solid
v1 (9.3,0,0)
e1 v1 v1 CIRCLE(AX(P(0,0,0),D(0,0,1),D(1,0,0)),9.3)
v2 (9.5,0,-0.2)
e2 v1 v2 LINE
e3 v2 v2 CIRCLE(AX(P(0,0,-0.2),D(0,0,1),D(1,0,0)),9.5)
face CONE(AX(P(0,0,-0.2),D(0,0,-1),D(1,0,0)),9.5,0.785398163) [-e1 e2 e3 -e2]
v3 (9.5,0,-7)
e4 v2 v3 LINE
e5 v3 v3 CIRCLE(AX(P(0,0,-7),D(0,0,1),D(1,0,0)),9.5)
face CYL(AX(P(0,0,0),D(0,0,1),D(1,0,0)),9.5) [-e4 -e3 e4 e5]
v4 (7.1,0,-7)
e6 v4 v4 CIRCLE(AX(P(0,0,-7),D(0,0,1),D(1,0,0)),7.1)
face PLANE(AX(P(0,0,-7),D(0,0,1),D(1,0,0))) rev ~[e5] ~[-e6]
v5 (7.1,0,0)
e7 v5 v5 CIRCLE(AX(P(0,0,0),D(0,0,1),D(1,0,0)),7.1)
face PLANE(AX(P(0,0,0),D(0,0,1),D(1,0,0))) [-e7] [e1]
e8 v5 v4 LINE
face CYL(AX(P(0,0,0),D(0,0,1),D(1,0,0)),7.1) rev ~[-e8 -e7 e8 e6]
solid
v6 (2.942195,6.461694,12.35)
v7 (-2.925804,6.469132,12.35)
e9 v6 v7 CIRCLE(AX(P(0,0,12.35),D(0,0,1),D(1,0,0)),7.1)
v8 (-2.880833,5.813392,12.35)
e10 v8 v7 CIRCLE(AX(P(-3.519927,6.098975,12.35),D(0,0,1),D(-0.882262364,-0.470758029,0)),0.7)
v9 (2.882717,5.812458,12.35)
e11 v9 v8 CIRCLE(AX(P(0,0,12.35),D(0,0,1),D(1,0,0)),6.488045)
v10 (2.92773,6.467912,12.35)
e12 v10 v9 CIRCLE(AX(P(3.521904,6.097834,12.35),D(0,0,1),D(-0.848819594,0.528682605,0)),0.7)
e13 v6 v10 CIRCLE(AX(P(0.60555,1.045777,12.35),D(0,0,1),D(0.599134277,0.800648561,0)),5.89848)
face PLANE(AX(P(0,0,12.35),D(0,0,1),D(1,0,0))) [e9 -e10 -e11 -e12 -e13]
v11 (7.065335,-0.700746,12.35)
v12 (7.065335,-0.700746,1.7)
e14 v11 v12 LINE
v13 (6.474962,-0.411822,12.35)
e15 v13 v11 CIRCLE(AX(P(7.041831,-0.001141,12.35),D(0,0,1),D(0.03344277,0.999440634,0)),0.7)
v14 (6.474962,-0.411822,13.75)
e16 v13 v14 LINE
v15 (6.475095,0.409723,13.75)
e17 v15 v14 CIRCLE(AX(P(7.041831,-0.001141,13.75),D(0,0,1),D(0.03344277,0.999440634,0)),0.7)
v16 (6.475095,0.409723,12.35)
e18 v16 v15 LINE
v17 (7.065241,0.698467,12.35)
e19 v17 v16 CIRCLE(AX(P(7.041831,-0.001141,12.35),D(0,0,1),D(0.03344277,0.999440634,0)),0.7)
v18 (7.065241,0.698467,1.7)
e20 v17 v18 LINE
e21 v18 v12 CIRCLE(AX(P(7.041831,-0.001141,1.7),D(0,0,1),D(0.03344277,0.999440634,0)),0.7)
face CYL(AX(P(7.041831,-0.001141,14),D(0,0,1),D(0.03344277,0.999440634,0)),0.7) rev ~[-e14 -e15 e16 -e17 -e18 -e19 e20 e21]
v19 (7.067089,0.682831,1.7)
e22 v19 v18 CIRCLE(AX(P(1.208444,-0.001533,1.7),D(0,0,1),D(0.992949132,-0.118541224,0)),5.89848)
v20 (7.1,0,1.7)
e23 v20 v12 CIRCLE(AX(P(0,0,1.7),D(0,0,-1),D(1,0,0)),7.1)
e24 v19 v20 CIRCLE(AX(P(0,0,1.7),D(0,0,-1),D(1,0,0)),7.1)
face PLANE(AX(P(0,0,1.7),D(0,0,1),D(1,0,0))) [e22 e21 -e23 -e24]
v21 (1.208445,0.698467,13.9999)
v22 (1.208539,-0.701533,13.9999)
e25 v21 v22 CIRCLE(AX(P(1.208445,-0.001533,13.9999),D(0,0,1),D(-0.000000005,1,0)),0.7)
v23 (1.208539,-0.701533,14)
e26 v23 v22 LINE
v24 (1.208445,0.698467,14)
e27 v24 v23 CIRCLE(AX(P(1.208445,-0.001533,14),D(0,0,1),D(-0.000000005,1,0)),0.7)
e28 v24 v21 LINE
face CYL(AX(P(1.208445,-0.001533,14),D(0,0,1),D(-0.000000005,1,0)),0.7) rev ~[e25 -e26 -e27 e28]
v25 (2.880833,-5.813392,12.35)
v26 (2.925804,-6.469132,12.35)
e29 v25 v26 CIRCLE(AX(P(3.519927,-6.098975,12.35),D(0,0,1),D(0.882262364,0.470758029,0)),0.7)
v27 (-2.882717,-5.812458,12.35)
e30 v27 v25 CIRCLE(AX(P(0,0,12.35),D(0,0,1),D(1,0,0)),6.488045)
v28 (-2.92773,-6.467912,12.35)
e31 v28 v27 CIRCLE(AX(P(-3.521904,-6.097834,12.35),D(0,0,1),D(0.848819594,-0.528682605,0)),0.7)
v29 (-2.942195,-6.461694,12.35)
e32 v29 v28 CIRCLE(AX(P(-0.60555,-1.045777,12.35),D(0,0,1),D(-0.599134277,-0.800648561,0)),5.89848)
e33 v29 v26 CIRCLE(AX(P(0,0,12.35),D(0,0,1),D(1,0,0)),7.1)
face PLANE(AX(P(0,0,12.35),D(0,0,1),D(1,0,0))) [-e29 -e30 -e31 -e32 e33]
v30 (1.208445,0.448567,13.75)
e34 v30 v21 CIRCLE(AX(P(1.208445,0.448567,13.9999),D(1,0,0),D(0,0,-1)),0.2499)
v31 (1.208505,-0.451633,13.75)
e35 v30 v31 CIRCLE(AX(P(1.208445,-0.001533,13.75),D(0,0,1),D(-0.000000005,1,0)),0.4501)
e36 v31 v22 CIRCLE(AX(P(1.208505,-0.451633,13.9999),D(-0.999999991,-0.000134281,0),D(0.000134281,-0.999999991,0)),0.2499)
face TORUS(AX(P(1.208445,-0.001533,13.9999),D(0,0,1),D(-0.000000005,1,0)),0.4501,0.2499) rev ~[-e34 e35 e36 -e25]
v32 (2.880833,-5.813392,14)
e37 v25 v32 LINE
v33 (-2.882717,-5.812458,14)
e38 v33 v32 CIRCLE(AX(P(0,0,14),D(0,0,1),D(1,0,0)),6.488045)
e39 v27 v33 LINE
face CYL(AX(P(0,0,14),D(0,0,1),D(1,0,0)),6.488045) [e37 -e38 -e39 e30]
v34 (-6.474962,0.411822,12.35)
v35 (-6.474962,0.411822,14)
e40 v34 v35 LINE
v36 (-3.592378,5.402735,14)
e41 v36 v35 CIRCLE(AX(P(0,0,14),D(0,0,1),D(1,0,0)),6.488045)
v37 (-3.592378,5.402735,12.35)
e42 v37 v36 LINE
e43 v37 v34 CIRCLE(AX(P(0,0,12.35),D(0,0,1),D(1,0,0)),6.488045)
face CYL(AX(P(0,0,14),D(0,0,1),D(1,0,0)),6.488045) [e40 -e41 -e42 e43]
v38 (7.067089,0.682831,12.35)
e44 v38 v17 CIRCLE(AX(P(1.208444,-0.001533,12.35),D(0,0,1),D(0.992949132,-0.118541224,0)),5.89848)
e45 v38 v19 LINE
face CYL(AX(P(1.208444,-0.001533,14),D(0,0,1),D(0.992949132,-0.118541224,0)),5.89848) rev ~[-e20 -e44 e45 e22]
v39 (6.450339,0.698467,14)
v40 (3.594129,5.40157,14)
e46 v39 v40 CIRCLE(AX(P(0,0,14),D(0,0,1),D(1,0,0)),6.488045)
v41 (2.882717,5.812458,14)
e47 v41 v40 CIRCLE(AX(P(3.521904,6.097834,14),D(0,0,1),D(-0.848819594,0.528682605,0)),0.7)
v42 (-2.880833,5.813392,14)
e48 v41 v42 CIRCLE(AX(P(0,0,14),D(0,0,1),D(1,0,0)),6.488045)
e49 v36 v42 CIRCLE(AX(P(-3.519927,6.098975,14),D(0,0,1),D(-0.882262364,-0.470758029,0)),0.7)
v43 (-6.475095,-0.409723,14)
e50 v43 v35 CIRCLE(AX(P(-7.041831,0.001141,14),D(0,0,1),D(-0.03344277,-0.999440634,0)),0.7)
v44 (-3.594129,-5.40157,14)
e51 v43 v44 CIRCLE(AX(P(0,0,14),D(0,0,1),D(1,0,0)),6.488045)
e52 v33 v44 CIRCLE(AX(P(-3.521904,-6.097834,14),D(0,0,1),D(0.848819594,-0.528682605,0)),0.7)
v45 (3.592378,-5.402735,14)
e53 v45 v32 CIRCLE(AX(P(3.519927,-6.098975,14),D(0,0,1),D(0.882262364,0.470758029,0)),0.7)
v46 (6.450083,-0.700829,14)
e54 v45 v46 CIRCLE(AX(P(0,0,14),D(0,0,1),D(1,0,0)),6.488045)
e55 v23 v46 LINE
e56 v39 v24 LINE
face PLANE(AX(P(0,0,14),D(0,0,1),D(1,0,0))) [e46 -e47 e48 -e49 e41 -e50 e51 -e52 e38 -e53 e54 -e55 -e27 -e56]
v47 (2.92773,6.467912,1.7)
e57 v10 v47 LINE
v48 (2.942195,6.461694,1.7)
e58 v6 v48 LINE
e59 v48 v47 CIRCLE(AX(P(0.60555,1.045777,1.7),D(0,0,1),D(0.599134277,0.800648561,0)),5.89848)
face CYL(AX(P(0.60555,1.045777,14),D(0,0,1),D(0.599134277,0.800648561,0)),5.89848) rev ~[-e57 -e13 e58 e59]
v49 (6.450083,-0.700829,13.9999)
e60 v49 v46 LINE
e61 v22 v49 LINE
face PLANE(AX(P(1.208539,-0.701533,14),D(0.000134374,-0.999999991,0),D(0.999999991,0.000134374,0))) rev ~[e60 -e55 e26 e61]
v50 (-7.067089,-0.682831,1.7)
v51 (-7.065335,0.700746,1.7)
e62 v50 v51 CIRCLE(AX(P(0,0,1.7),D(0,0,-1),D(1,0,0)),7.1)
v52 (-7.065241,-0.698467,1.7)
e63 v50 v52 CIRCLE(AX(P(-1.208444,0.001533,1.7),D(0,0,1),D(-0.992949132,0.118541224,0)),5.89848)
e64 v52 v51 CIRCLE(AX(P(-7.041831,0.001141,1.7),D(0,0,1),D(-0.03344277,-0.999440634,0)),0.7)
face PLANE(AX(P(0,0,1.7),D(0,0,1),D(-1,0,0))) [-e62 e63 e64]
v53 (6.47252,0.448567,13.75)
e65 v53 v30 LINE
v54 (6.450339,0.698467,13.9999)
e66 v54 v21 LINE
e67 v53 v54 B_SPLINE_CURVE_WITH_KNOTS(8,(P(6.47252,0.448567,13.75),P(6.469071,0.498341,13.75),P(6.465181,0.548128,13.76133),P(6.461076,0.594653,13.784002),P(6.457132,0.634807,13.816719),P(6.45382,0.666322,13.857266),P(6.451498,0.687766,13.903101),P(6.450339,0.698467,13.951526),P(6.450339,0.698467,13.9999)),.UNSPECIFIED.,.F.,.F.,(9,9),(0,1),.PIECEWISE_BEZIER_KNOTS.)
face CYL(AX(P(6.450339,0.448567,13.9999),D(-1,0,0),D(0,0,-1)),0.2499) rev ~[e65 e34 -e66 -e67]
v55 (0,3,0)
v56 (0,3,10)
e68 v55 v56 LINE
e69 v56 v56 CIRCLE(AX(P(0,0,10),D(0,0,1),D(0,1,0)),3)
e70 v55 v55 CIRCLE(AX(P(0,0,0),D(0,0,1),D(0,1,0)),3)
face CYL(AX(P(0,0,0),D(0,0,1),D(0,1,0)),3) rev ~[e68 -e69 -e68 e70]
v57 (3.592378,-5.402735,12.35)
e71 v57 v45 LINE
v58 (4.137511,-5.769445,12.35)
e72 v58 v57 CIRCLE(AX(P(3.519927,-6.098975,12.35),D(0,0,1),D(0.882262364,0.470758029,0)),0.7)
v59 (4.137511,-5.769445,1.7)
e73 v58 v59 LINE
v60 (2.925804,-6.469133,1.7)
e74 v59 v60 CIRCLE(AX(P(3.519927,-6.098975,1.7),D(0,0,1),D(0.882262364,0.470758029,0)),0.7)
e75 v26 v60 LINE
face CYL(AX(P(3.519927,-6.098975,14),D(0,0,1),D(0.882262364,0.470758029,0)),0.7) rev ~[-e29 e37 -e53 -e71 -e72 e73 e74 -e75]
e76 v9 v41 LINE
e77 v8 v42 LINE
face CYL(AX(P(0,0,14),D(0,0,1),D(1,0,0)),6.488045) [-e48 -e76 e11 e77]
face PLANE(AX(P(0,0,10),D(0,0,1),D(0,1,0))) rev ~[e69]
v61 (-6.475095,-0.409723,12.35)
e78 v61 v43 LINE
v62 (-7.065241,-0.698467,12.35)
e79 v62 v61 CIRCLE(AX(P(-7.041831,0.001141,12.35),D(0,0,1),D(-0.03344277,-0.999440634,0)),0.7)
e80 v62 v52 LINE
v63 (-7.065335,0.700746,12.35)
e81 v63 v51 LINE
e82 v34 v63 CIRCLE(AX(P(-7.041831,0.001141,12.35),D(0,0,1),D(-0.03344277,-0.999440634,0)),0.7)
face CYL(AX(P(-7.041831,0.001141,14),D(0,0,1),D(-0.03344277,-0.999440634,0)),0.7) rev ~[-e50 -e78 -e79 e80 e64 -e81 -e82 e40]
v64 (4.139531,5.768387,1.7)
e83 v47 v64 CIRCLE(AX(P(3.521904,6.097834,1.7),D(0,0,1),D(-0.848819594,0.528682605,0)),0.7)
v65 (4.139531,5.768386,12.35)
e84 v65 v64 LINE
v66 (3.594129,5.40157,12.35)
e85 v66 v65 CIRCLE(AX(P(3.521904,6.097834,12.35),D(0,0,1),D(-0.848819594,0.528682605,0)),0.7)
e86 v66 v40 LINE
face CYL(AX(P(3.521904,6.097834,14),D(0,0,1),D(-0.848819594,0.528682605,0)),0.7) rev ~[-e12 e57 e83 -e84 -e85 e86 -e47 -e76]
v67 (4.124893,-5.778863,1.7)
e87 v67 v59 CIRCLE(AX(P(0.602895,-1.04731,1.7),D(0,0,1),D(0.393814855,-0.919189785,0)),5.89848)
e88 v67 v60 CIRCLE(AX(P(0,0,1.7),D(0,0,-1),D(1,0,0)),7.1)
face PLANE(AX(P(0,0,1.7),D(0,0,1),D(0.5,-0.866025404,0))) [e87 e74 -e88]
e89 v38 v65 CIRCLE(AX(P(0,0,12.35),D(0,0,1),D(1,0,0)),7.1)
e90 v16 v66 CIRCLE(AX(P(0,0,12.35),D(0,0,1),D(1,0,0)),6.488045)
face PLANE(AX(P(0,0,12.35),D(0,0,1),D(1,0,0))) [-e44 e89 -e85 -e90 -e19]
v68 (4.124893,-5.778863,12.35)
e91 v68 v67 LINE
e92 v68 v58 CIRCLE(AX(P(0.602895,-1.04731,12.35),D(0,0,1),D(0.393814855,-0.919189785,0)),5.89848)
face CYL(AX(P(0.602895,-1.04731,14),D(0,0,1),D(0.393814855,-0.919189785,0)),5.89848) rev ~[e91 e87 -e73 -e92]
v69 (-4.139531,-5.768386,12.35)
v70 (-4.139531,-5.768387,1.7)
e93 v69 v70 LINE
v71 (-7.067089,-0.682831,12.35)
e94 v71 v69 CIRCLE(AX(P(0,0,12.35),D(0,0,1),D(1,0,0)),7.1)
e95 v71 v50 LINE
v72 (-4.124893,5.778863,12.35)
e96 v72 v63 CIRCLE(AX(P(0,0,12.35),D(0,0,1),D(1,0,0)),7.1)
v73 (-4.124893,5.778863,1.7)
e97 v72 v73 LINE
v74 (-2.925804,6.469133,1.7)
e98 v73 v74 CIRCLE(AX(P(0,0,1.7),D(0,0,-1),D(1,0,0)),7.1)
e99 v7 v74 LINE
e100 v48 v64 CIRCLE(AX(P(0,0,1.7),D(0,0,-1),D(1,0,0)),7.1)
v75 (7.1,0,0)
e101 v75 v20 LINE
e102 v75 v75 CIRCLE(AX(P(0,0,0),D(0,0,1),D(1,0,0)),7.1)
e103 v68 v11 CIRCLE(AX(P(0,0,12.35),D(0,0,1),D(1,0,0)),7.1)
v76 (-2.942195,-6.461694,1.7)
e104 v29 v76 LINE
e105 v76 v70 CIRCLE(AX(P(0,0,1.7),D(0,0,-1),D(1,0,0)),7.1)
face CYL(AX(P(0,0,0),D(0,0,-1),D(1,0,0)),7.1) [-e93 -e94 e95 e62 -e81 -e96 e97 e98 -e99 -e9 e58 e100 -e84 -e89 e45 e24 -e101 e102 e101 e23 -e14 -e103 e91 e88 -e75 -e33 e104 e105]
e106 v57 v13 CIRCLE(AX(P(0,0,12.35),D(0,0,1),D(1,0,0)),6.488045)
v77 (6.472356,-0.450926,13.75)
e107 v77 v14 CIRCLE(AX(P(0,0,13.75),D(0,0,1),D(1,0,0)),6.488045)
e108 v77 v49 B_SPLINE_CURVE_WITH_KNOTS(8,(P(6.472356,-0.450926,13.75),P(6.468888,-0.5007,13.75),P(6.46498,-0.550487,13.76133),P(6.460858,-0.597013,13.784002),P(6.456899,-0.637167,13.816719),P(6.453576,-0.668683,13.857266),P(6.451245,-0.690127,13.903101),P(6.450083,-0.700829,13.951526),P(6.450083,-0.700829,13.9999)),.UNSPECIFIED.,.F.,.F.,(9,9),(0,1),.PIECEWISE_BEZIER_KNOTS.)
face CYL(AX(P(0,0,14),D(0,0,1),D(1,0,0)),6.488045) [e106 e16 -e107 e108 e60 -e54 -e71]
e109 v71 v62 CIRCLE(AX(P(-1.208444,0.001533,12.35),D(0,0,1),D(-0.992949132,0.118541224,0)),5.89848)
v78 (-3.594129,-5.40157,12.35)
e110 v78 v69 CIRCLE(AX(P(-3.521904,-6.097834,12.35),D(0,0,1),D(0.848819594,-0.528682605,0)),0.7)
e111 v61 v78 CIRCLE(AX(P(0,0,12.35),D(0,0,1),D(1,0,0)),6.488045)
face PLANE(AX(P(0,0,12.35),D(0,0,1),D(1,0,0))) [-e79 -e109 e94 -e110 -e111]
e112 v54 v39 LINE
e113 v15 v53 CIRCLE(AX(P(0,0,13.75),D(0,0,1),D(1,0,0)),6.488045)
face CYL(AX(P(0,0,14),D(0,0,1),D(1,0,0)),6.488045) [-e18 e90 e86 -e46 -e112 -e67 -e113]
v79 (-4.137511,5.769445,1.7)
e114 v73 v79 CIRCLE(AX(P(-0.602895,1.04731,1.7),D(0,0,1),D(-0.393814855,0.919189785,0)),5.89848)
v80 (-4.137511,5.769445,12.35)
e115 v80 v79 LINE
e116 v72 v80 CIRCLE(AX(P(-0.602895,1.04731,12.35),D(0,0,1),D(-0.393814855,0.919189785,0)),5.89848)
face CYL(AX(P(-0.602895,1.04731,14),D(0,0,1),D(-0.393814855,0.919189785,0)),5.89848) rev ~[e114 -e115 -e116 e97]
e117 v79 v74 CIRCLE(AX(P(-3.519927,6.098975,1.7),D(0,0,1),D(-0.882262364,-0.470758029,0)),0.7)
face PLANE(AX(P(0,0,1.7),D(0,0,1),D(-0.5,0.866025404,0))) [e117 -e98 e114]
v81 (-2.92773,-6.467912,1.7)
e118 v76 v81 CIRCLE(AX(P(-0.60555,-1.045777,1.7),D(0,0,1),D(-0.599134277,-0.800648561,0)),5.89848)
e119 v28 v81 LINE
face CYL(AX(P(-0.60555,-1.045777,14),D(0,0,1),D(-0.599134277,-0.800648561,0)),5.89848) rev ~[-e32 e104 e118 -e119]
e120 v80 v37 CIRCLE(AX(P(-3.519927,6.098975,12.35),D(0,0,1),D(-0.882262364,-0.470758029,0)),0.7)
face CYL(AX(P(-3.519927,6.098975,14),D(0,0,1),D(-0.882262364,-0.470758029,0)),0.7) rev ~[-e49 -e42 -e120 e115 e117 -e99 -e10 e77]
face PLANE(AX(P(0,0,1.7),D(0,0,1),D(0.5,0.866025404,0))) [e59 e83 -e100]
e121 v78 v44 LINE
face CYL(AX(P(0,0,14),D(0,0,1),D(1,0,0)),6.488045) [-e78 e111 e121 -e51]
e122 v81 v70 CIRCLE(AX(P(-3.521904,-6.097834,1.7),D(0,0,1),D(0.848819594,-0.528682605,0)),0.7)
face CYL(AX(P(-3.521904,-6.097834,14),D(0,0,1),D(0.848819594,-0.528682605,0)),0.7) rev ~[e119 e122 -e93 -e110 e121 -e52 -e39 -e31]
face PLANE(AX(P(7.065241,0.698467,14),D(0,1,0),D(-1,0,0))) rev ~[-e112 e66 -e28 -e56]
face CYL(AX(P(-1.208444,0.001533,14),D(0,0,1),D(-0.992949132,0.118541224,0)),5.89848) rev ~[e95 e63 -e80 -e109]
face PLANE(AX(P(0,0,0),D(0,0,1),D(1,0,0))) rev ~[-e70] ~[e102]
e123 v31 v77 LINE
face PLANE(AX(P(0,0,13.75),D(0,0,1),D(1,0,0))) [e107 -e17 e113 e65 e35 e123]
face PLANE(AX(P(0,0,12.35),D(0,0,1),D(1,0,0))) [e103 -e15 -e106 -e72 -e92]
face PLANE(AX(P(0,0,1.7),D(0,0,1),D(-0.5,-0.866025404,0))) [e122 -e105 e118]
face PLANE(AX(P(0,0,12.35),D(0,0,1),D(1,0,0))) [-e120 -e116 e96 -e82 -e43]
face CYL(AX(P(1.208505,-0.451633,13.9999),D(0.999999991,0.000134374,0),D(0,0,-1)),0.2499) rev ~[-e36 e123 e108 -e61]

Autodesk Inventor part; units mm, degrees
ref_plane "YZ Plane" through (0, 0, 0) normal (1, 0, 0) x (0, 1, 0)
ref_plane "XZ Plane" through (0, 0, 0) normal (0, 1, 0) x (-1, 0, 0)
ref_plane "XY Plane" through (0, 0, 0) normal (0, 0, 1) x (1, 0, 0)
sketch "Sketch1" plane through (0, 0, 0) normal (0, 0, 1) x (1, 0, 0)
  circle A0 centre (0, 0) radius 9.5
  circle A1 centre (0, 0) radius 7.1
  dimension "d0" = 19
  dimension "d1" = 14.2
extrude "Extrusion1" add sketch "Sketch1" along normal blind 14 contours A1
extrude "Extrusion2" add sketch "Sketch1" against normal blind 7
hole "Hole1" at (0, 0, 0) direction (0, 0, 1) diameter 6 depth 10
sketch "Sketch2" plane through (0, 0, 14) normal (0, 0, 1) x (1, 0, 0)
  arc A0 (7.065241, 0.698467) -> (7.065335, -0.700746) centre (7.041831, -0.001141) ccw
  arc A1 (7.065335, -0.700746) -> (7.065241, 0.698467) centre (1.208445, -0.001533) ccw
  arc A2 (1.208445, 0.698467) -> (1.208539, -0.701533) centre (1.208445, -0.001533) ccw
  line L0 (1.208445, 0.698467) -> (7.065241, 0.698467)
  circle A3 centre (0, 0) radius 7.1
  line L1 (7.065335, -0.700746) -> (1.208539, -0.701533)
  dimension "d25" = 0.7
  dimension "d26" = 0.7
sketch "Sketch2 outline for Extrusion3" plane through (0, 0, 14) normal (0, 0, 1) x (1, 0, 0)
  arc A0 (7.065241, 0.698467) -> (7.065335, -0.700746) centre (7.041831, -0.001141) ccw
  arc A1 (7.065335, -0.700746) -> (7.065241, 0.698467) centre (1.208445, -0.001533) ccw
extrude "Extrusion3" cut sketch "Sketch2 outline for Extrusion3" against normal blind 12.3
pattern_circular "Circular Pattern1" count 6 over 360 about axis through (0, 0, 0) along (0, 0, 1) of "Extrusion3"
sketch "Sketch3" plane through (0, 0, 14) normal (0, 0, 1) x (1, 0, 0)
  circle A0 centre (0, 0) radius 6.488045
  circle A1 centre (0, 0) radius 7.1
extrude "Extrusion4" cut sketch "Sketch3" against normal blind 1.65
sketch "Sketch2 outline for Extrusion5" plane through (0, 0, 14) normal (0, 0, 1) x (1, 0, 0)
  line L0 (7.065241, 0.698467) -> (1.208445, 0.698467)
  arc A0 (7.065335, -0.700746) -> (7.065241, 0.698467) centre (1.208445, -0.001533) ccw
  line L1 (1.208539, -0.701533) -> (7.065335, -0.700746)
  arc A1 (1.208445, 0.698467) -> (1.208539, -0.701533) centre (1.208445, -0.001533) ccw
extrude "Extrusion5" cut sketch "Sketch2 outline for Extrusion5" against normal blind 0.25
fillet "Fillet1" radius 0.25 3 edges at (0.5084, -0.0016, 13.75) (3.8293, -0.7012, 13.75) (3.8294, 0.6985, 13.75)
chamfer "Chamfer1" distance 0.2 angle 45 1 edges at (-9.5, 0, 0)
equation "\"d26\" = d25"
properties part number "Potentiometer knob" material "PC/ABS Plastic"
